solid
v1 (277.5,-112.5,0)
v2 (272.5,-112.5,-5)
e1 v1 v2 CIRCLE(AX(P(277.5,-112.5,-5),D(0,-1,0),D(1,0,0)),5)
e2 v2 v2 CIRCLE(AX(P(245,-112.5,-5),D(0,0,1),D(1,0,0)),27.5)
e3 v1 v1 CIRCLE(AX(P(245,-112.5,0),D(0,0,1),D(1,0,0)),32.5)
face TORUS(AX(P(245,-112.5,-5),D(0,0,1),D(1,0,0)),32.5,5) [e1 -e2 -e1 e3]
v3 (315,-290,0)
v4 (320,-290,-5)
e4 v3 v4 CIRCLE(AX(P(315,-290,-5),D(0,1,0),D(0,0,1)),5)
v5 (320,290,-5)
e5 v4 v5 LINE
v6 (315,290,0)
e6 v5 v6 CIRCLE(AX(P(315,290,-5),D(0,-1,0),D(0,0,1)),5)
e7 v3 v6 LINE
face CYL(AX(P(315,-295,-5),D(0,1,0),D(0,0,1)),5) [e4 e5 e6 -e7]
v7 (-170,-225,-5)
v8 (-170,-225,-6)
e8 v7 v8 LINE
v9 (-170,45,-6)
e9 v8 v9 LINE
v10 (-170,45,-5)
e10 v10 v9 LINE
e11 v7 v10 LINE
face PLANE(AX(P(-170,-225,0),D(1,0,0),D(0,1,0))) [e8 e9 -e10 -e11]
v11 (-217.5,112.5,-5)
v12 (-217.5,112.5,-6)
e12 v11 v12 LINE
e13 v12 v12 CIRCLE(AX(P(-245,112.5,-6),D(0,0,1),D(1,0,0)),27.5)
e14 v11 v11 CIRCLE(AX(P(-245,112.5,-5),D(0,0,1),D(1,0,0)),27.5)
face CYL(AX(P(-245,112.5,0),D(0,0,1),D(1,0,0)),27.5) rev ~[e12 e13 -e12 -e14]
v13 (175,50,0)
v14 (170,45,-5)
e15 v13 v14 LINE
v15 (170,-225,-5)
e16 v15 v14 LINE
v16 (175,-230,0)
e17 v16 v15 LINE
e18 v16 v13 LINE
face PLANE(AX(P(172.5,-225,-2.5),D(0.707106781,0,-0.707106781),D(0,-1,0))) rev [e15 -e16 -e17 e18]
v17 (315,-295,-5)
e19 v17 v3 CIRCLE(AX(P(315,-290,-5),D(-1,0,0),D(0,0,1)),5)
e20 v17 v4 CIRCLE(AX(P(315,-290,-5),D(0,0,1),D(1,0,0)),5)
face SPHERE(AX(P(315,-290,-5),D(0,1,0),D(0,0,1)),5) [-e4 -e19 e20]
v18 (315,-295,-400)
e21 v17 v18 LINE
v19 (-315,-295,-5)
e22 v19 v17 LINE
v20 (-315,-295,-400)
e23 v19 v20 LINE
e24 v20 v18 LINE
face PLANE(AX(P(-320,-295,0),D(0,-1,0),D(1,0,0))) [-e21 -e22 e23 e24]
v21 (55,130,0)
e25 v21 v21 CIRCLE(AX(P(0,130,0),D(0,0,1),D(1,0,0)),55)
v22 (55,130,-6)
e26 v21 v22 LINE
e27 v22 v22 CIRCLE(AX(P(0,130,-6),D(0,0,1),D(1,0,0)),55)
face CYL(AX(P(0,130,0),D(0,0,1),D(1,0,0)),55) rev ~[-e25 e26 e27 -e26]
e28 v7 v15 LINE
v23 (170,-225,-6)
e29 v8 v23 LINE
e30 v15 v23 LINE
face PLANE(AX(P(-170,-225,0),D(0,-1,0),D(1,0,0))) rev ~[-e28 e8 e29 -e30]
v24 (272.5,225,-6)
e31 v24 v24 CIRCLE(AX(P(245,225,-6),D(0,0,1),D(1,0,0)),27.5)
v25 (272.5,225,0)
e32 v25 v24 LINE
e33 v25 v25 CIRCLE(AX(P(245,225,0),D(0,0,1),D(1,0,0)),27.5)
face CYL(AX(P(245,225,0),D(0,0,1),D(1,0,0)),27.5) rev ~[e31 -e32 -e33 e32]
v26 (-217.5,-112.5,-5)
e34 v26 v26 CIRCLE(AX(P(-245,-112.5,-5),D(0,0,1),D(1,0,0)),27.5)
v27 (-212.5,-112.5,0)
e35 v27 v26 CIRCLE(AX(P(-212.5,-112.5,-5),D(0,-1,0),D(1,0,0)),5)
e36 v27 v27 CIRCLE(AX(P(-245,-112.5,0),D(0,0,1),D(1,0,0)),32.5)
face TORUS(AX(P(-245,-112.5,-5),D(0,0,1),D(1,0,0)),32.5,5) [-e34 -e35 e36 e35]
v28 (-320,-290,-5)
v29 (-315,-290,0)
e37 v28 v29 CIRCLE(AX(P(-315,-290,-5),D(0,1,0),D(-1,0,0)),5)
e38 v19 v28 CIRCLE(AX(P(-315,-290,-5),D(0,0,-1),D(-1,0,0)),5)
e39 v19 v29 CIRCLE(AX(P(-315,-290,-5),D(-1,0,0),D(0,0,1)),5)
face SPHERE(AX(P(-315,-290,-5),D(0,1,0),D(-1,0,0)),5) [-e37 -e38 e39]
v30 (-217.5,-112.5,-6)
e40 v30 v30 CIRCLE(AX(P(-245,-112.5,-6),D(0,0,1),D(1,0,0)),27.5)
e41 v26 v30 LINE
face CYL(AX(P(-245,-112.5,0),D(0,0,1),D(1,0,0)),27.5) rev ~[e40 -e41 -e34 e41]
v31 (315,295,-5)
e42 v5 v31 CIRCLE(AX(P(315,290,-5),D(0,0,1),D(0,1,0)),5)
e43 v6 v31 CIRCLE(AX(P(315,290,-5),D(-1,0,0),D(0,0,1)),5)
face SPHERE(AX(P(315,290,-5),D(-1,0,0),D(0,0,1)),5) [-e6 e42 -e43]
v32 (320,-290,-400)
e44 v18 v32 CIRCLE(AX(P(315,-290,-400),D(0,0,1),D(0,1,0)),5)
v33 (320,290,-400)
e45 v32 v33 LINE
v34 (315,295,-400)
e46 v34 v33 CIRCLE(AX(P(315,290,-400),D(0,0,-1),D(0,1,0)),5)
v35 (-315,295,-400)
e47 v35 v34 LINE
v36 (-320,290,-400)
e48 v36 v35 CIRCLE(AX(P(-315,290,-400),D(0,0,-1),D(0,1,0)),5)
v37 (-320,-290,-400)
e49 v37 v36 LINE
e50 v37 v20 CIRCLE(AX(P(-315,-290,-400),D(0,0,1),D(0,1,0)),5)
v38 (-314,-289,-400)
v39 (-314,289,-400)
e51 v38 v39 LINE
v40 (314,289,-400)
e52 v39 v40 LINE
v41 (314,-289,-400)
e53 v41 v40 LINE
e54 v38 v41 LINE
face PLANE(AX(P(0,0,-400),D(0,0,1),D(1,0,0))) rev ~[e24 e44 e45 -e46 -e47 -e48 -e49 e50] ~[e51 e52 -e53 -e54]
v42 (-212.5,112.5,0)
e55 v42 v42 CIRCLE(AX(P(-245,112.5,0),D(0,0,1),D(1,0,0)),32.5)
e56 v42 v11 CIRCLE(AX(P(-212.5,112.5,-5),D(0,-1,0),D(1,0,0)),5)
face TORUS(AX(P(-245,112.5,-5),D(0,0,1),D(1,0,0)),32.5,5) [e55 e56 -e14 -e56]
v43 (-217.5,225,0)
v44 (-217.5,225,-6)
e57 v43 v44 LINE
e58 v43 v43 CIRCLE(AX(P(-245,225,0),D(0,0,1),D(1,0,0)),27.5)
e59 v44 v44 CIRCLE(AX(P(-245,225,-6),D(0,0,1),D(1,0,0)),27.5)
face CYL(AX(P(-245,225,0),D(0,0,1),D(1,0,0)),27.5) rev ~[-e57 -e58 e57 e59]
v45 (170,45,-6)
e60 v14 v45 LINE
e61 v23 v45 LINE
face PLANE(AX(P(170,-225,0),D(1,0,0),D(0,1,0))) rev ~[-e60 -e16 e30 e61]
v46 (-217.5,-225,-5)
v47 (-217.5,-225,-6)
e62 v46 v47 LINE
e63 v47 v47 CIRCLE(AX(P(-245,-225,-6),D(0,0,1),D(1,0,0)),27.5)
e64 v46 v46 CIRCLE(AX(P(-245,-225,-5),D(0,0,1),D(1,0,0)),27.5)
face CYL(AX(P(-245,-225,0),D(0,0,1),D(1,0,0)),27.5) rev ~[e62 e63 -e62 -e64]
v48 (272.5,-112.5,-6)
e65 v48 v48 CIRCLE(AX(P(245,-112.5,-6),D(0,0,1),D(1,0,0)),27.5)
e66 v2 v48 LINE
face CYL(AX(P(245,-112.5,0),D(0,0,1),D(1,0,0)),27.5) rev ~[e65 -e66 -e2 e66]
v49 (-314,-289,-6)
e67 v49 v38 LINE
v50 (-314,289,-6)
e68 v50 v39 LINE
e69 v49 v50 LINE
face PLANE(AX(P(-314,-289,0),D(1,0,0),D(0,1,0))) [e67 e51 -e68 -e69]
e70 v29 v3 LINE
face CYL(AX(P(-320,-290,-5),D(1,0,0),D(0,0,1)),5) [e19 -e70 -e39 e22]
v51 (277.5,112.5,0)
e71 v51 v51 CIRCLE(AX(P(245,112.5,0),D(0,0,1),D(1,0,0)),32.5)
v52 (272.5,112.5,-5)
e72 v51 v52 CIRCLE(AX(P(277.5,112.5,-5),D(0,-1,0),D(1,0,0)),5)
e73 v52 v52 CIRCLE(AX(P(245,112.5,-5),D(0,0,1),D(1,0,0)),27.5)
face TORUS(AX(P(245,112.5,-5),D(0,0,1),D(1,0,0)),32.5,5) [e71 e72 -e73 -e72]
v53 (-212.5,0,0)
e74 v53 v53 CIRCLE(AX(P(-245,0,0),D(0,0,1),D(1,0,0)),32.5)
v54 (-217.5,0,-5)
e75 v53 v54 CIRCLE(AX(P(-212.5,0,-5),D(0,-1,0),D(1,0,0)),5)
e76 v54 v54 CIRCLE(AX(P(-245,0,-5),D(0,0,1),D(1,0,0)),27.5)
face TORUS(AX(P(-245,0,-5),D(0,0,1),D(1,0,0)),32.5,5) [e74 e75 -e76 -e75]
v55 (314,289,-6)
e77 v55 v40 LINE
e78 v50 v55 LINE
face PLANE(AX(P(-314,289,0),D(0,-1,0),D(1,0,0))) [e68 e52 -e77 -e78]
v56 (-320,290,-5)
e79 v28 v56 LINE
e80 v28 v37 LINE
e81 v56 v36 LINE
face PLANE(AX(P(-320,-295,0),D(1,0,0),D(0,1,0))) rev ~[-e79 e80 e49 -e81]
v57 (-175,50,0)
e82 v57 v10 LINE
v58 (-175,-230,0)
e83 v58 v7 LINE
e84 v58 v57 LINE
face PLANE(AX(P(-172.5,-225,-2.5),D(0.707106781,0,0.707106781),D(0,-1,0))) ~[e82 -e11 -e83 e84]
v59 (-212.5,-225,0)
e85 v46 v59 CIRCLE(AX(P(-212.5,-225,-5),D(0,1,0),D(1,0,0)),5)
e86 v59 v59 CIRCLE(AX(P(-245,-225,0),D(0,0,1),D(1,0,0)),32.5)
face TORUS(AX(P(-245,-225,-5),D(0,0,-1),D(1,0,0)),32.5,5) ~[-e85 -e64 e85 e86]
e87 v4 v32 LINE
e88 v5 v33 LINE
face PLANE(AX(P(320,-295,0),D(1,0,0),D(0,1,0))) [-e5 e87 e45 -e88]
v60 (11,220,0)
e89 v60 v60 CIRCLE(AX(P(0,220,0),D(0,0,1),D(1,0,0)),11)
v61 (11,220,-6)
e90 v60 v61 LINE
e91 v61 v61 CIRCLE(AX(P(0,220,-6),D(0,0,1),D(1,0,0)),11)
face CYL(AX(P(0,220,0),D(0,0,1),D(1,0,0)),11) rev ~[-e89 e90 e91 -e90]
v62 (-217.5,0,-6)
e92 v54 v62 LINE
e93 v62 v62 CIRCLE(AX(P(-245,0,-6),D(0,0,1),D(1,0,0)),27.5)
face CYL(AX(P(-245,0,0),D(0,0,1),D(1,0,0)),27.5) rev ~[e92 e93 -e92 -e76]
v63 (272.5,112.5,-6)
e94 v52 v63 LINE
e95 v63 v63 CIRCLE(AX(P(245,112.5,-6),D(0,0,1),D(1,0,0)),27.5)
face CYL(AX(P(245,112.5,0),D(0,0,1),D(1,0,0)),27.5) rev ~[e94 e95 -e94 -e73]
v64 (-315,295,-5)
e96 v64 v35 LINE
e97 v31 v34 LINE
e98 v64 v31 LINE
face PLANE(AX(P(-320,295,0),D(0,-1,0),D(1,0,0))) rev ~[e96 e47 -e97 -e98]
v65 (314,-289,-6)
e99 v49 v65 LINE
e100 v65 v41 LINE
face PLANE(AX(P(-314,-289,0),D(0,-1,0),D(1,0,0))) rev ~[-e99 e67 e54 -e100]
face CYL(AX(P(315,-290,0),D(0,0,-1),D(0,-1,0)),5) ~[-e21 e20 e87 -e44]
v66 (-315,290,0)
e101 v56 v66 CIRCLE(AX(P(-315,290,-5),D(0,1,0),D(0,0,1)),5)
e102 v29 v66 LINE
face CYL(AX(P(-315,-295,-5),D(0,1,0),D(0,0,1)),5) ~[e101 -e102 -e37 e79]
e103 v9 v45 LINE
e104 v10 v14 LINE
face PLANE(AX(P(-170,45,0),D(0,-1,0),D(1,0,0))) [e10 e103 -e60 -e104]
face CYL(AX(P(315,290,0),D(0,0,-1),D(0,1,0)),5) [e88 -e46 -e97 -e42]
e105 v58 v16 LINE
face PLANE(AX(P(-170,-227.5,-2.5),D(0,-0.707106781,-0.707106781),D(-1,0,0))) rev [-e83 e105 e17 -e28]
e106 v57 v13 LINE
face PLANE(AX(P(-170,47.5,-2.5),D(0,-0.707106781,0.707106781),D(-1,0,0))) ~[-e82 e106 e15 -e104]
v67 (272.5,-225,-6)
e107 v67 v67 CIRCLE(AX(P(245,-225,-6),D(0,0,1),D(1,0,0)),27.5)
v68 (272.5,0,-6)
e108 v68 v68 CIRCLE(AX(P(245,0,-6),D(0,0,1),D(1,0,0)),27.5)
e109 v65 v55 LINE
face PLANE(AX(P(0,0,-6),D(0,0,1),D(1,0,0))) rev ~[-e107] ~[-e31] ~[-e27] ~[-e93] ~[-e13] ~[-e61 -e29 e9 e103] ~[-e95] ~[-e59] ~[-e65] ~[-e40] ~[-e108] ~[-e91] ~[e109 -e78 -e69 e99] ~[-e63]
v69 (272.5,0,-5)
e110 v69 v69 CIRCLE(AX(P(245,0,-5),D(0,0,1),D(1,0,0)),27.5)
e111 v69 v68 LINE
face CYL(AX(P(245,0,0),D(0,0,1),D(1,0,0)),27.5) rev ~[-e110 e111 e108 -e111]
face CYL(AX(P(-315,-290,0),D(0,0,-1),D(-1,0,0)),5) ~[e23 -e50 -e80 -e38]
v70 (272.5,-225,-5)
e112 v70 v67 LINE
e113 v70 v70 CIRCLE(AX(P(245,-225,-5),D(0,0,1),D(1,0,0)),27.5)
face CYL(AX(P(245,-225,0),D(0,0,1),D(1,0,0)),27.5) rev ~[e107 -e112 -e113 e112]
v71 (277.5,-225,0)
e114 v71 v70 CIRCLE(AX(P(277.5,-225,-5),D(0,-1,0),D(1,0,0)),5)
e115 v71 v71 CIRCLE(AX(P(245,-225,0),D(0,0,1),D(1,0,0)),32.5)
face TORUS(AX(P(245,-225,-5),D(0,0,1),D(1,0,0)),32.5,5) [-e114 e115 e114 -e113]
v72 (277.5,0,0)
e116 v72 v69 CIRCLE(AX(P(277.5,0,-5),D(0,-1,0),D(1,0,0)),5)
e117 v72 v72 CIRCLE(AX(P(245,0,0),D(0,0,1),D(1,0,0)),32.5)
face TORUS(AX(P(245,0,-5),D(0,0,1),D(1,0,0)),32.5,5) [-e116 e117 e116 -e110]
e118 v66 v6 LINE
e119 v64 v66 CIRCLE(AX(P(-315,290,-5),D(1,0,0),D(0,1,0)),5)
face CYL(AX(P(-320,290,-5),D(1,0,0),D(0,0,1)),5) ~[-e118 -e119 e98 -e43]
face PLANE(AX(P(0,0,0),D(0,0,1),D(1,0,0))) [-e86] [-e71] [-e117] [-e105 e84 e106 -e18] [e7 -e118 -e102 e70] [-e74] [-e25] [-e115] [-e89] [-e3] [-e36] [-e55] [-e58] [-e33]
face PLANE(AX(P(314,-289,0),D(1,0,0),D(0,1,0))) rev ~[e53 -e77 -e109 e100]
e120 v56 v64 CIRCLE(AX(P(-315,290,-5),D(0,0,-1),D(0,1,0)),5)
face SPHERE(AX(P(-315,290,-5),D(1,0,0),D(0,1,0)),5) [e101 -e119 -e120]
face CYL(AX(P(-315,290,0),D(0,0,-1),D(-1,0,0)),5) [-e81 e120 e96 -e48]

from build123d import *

# Parameters (mm, degrees)
F0_W     = 640
F0_H     = 590
F0_W_2   = 628
F0_H_2   = 578
F1_DEPTH = 400
F0_R     = 27.5
F0_W_3   = 340
F0_H_3   = 270
F0_R_2   = 55
F0_R_3   = 11
F2_DEPTH = 6
F3_R     = 5
F4_SIZE  = 5


# Not quite as in the source:
# - a feature names something its author has since deleted; it is built from what else it names


with BuildPart() as f1:
    # F0 (on Top) → F1 (new body)
    with BuildSketch(Plane.XY):
        Rectangle(F0_W, F0_H)
        Rectangle(F0_W_2, F0_H_2, mode=Mode.SUBTRACT)
    extrude(amount=-F1_DEPTH)

    # F0 (on Top) → F2 (join)
    with BuildSketch(Plane.XY):
        Rectangle(F0_W_2, F0_H_2)
        with Locations((-245, -225)):
            Circle(F0_R, mode=Mode.SUBTRACT)
        with Locations((-245, -112.5)):
            Circle(F0_R, mode=Mode.SUBTRACT)
        with Locations((245, -225)):
            Circle(F0_R, mode=Mode.SUBTRACT)
        with Locations((0, -90)):
            Rectangle(F0_W_3, F0_H_3, mode=Mode.SUBTRACT)
        with Locations((245, -112.5)):
            Circle(F0_R, mode=Mode.SUBTRACT)
        with Locations((-245, 0)):
            Circle(F0_R, mode=Mode.SUBTRACT)
        with Locations((-245, 112.5)):
            Circle(F0_R, mode=Mode.SUBTRACT)
        with Locations((-245, 225)):
            Circle(F0_R, mode=Mode.SUBTRACT)
        with Locations((0, 130)):
            Circle(F0_R_2, mode=Mode.SUBTRACT)
        with Locations((245, 0)):
            Circle(F0_R, mode=Mode.SUBTRACT)
        with Locations((245, 112.5)):
            Circle(F0_R, mode=Mode.SUBTRACT)
        with Locations((0, 220)):
            Circle(F0_R_3, mode=Mode.SUBTRACT)
        with Locations((245, 225)):
            Circle(F0_R, mode=Mode.SUBTRACT)
    extrude(amount=-F2_DEPTH)

    # F3
    f3_edges = [f1.edges().sort_by_distance(p)[0] for p in [
        (0, 295, 0),
        (320, 0, 0),
        (320, 295, -200),
        (-320, 295, -200),
        (-320, 0, 0),
        (-320, -295, -200),
        (0, -295, 0),
        (320, -295, -200),
        (-272.5, 112.5, 0),
        (-272.5, 0, 0),
        (-272.5, -112.5, 0),
        (217.5, -225, 0),
        (217.5, -112.5, 0),
        (-272.5, -225, 0),
        (217.5, 0, 0),
        (217.5, 112.5, 0),
    ]]
    fillet(f3_edges, radius=F3_R)

    # F4
    f4_edges = [f1.edges().sort_by_distance(p)[0] for p in [
        (-170, -90, 0),
        (0, 45, 0),
        (170, -90, 0),
        (0, -225, 0),
    ]]
    chamfer(f4_edges, length=F4_SIZE)


solid = f1.part
